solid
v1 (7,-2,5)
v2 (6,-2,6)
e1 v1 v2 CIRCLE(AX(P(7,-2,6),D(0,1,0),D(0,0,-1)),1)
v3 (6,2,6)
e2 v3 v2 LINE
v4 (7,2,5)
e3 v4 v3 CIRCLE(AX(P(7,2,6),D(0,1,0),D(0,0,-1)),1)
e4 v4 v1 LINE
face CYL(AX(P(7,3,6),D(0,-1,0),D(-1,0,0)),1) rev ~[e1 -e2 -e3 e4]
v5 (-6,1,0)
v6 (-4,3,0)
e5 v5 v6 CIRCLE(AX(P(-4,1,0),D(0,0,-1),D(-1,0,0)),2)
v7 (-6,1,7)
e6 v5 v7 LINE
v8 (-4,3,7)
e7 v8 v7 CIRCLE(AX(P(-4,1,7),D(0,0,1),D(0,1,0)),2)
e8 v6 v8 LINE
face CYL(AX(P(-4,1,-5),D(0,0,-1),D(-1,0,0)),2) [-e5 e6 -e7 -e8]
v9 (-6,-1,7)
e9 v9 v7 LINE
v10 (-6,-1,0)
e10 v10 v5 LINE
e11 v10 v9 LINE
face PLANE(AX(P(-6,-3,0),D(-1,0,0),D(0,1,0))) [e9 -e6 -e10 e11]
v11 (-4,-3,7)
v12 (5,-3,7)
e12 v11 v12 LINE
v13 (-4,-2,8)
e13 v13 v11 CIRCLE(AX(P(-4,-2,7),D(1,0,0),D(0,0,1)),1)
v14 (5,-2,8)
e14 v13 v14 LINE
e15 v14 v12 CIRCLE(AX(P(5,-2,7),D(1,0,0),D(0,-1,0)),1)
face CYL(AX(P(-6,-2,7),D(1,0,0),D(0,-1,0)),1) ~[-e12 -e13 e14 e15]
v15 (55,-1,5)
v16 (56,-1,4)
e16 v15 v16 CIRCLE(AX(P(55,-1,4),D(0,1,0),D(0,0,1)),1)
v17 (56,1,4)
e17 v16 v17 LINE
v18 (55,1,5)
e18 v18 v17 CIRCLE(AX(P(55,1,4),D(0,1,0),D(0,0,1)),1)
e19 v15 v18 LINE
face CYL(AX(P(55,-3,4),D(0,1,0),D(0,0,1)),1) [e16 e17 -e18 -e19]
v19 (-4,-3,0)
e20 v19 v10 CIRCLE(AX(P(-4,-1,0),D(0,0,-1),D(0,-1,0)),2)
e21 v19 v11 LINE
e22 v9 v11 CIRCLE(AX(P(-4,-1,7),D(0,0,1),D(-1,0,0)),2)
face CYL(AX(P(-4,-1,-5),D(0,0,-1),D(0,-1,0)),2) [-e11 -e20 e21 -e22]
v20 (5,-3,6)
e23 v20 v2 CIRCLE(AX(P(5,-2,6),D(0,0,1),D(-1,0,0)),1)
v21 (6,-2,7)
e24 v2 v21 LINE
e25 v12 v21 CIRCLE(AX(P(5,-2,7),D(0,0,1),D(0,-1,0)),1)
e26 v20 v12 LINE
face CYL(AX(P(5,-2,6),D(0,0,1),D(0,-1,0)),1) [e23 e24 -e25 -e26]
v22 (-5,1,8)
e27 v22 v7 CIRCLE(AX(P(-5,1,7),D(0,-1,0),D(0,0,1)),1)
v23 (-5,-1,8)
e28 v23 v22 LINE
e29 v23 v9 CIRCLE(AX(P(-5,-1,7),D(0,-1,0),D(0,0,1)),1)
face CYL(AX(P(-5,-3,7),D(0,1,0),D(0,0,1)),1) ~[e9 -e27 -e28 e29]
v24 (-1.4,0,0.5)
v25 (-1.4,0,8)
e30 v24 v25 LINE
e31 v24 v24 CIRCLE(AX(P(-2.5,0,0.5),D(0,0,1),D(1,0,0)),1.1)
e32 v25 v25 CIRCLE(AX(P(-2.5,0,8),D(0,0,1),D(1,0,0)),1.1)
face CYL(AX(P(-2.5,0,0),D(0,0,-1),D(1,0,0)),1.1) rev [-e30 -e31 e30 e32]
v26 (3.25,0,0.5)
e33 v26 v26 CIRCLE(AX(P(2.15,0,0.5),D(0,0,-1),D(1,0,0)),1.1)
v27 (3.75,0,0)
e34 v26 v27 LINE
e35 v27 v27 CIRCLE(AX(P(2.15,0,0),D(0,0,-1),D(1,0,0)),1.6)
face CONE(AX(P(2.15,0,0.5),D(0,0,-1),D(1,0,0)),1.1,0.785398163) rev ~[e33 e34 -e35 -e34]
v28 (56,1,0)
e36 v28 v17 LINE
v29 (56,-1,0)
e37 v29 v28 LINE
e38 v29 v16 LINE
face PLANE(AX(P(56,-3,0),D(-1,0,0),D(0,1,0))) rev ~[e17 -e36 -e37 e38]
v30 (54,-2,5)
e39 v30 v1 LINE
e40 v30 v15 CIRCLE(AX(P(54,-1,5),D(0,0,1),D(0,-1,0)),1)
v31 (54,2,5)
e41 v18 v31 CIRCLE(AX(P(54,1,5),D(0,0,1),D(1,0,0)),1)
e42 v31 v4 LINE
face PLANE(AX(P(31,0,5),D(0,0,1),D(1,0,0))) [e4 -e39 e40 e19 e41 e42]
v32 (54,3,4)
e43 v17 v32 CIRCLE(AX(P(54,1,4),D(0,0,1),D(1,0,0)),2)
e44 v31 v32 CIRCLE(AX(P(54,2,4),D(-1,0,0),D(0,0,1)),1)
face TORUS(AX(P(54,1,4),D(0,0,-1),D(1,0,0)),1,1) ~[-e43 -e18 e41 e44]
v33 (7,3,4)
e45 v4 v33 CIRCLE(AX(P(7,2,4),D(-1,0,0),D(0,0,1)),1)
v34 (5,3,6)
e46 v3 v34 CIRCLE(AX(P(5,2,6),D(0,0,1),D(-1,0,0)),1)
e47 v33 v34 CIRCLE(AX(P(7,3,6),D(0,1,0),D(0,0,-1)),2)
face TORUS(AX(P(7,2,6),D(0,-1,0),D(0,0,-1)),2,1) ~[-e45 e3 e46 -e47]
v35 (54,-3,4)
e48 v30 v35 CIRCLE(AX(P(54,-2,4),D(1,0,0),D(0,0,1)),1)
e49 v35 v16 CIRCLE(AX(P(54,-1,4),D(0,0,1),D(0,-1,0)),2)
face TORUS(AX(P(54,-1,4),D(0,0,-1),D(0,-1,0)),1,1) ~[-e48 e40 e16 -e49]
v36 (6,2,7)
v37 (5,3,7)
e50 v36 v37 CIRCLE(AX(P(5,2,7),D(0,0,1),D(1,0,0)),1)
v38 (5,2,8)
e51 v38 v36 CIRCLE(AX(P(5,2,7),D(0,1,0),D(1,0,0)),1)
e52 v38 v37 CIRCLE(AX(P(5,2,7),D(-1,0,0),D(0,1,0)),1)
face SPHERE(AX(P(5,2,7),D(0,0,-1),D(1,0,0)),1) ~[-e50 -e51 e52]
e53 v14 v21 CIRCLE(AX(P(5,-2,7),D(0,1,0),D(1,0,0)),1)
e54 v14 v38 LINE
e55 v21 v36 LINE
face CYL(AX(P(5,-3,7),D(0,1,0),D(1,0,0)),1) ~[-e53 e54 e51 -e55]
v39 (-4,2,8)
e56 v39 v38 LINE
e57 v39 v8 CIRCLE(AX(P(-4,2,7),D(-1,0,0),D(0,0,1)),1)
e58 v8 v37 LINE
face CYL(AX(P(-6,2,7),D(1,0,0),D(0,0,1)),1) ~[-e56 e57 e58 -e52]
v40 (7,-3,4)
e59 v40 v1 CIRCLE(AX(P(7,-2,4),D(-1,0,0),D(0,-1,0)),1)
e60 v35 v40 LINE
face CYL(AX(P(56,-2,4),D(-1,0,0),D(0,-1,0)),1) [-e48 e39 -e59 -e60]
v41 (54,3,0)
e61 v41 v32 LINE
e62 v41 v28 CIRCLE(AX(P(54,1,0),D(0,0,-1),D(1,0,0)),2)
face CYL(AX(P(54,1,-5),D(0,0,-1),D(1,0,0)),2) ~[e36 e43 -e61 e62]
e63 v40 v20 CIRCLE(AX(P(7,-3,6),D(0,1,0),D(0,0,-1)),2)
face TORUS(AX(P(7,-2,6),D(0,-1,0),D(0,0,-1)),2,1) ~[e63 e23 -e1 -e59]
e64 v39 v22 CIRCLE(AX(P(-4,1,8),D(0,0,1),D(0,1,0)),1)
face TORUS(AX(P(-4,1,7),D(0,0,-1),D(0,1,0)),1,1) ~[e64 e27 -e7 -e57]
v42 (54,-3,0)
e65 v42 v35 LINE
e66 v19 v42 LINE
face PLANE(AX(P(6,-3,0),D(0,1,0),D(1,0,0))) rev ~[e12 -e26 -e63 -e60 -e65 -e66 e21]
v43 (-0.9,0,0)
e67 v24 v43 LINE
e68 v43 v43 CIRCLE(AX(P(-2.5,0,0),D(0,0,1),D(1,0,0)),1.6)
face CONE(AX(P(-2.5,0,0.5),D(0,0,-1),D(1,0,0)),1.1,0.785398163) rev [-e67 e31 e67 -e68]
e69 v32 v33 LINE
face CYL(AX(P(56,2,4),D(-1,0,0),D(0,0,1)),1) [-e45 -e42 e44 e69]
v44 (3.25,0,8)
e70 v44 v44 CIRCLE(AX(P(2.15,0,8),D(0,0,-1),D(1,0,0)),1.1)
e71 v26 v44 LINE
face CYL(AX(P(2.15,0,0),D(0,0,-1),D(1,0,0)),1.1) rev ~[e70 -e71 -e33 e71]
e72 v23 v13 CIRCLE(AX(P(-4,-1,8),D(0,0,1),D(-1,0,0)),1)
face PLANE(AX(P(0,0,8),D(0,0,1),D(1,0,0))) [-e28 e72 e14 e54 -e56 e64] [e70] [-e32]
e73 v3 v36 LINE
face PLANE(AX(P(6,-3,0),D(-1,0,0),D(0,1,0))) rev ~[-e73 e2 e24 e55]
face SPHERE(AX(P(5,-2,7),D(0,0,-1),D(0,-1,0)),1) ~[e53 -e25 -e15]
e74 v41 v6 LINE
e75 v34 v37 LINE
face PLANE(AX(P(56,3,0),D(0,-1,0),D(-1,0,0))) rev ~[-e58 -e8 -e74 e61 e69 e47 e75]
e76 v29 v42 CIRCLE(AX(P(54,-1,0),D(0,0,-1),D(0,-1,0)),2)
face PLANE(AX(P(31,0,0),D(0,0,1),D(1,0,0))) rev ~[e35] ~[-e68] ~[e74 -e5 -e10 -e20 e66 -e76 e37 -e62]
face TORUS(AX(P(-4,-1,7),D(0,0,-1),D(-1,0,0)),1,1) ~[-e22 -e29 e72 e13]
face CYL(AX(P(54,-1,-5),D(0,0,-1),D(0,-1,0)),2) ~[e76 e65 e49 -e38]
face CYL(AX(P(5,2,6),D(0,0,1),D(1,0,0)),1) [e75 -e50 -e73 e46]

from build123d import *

# Parameters (mm, degrees)
F0_W         = 12
F0_H         = 6
F0_R         = 1.1
F1_DEPTH     = 8
F3_DEPTH     = 5
F4_SIZE      = 0.5
F5_F1_R      = 1
F5_F2_R      = 1
F6_T1_DEPTH  = 13
F6_T3_DEPTH  = 10
F6_T6_ANGLE  = 90
F6_T8_ANGLE  = 90
F6_T10_ANGLE = 90
F6_T12_ANGLE = 90


# Not quite as in the source:
# - a fillet or chamfer that OpenCascade refuses, or shapes differently, is made with other operations: its cross-section is extruded or revolved along the edge and cut away or added


with BuildPart() as f1:
    # F0 (on Top) → F1 (new body)
    with BuildSketch(Plane.XY):
        Rectangle(F0_W, F0_H)
        with Locations((-2.5, 0)):
            Circle(F0_R, mode=Mode.SUBTRACT)
        with BuildLine():
            ThreePointArc((1.05, 0), (2.15, 1.1), (3.25, 0))
            ThreePointArc((3.25, 0), (2.15, -1.1), (1.05, 0))
        make_face(mode=Mode.SUBTRACT)
    extrude(amount=F1_DEPTH)

    # F2 (on Top) → F3 (join)
    with BuildSketch(Plane.XY):
        Polygon((56, -3), (56, 0), (56, 3), (6, 3), (6, 0), (6, -3), align=None)
    extrude(amount=F3_DEPTH)

    # F4
    f4_edges = [f1.edges().sort_by_distance(p)[0] for p in [
        (-3.6, 0, 0),
        (1.05, 0, 0),
    ]]
    chamfer(f4_edges, length=F4_SIZE)

    # F5: fillet of radius 1 on 8 edges, made by hand

    # F5_f1
    f5_f1_edges = [f1.edges().sort_by_distance(p)[0] for p in [
        (6, 0, 5),
    ]]
    fillet(f5_f1_edges, radius=F5_F1_R)

    # F5_f2
    f5_f2_edges = [f1.edges().sort_by_distance(p)[0] for p in [
        (6, -3, 7),
        (6, 3, 7),
        (56, 0, 5),
        (0, -3, 8),
        (6, 0, 8),
        (0, 3, 8),
        (-6, 0, 8),
        (6.2928932188, 3, 5.2928932188),
        (6.2928932188, -3, 5.2928932188),
    ]]
    fillet(f5_f2_edges, radius=F5_F2_R)

    # F6: fillet of radius 2 on 4 edges, made by hand

    # F6_s2 → F6_t1 (cut)
    with BuildSketch(Plane.XY.offset(-5)):
        with BuildLine():
            ThreePointArc((-4, -3), (-5.4142135624, -2.4142135624), (-6, -1))
            Line((-6, -1), (-6, -3))
            Line((-6, -3), (-4, -3))
        make_face()
        with BuildLine():
            ThreePointArc((-6, 1), (-5.4142135624, 2.4142135624), (-4, 3))
            Line((-4, 3), (-6, 3))
            Line((-6, 3), (-6, 1))
        make_face()
    extrude(amount=F6_T1_DEPTH, mode=Mode.SUBTRACT)

    # F6_s4 → F6_t3 (cut)
    with BuildSketch(Plane.XY.offset(-5)):
        with BuildLine():
            ThreePointArc((54, -3), (55.4142135624, -2.4142135624), (56, -1))
            Line((56, -1), (56, -3))
            Line((56, -3), (54, -3))
        make_face()
        with BuildLine():
            ThreePointArc((56, 1), (55.4142135624, 2.4142135624), (54, 3))
            Line((54, 3), (56, 3))
            Line((56, 3), (56, 1))
        make_face()
    extrude(amount=F6_T3_DEPTH, mode=Mode.SUBTRACT)

    # F6_s5 → F6_t6 (revolve, cut)
    with BuildSketch(Plane.XZ.offset(-1)):
        with BuildLine():
            ThreePointArc((55, 5), (55.7071067812, 4.7071067812), (56, 4))
            Line((56, 4), (56, 5))
            Line((56, 5), (55, 5))
        make_face()
    revolve(axis=Axis((54, 1, 5), (0, 0, 1)), revolution_arc=F6_T6_ANGLE, mode=Mode.SUBTRACT)

    # F6_s7 → F6_t8 (revolve, cut)
    with BuildSketch(Plane.YZ.offset(54)):
        with BuildLine():
            ThreePointArc((-2, 5), (-2.7071067812, 4.7071067812), (-3, 4))
            Line((-3, 4), (-3, 5))
            Line((-3, 5), (-2, 5))
        make_face()
    revolve(axis=Axis((54, -1, 5), (0, 0, 1)), revolution_arc=F6_T8_ANGLE, mode=Mode.SUBTRACT)

    # F6_s9 → F6_t10 (revolve, cut)
    with BuildSketch(Plane.YZ.offset(-4)):
        with BuildLine():
            ThreePointArc((2, 8), (2.7071067812, 7.7071067812), (3, 7))
            Line((3, 7), (3, 8))
            Line((3, 8), (2, 8))
        make_face()
    revolve(axis=Axis((-4, 1, 8), (0, 0, 1)), revolution_arc=F6_T10_ANGLE, mode=Mode.SUBTRACT)

    # F6_s11 → F6_t12 (revolve, cut)
    with BuildSketch(Plane.XZ.offset(1)):
        with BuildLine():
            ThreePointArc((-5, 8), (-5.7071067812, 7.7071067812), (-6, 7))
            Line((-6, 7), (-6, 8))
            Line((-6, 8), (-5, 8))
        make_face()
    revolve(axis=Axis((-4, -1, 8), (0, 0, 1)), revolution_arc=F6_T12_ANGLE, mode=Mode.SUBTRACT)


solid = f1.part
